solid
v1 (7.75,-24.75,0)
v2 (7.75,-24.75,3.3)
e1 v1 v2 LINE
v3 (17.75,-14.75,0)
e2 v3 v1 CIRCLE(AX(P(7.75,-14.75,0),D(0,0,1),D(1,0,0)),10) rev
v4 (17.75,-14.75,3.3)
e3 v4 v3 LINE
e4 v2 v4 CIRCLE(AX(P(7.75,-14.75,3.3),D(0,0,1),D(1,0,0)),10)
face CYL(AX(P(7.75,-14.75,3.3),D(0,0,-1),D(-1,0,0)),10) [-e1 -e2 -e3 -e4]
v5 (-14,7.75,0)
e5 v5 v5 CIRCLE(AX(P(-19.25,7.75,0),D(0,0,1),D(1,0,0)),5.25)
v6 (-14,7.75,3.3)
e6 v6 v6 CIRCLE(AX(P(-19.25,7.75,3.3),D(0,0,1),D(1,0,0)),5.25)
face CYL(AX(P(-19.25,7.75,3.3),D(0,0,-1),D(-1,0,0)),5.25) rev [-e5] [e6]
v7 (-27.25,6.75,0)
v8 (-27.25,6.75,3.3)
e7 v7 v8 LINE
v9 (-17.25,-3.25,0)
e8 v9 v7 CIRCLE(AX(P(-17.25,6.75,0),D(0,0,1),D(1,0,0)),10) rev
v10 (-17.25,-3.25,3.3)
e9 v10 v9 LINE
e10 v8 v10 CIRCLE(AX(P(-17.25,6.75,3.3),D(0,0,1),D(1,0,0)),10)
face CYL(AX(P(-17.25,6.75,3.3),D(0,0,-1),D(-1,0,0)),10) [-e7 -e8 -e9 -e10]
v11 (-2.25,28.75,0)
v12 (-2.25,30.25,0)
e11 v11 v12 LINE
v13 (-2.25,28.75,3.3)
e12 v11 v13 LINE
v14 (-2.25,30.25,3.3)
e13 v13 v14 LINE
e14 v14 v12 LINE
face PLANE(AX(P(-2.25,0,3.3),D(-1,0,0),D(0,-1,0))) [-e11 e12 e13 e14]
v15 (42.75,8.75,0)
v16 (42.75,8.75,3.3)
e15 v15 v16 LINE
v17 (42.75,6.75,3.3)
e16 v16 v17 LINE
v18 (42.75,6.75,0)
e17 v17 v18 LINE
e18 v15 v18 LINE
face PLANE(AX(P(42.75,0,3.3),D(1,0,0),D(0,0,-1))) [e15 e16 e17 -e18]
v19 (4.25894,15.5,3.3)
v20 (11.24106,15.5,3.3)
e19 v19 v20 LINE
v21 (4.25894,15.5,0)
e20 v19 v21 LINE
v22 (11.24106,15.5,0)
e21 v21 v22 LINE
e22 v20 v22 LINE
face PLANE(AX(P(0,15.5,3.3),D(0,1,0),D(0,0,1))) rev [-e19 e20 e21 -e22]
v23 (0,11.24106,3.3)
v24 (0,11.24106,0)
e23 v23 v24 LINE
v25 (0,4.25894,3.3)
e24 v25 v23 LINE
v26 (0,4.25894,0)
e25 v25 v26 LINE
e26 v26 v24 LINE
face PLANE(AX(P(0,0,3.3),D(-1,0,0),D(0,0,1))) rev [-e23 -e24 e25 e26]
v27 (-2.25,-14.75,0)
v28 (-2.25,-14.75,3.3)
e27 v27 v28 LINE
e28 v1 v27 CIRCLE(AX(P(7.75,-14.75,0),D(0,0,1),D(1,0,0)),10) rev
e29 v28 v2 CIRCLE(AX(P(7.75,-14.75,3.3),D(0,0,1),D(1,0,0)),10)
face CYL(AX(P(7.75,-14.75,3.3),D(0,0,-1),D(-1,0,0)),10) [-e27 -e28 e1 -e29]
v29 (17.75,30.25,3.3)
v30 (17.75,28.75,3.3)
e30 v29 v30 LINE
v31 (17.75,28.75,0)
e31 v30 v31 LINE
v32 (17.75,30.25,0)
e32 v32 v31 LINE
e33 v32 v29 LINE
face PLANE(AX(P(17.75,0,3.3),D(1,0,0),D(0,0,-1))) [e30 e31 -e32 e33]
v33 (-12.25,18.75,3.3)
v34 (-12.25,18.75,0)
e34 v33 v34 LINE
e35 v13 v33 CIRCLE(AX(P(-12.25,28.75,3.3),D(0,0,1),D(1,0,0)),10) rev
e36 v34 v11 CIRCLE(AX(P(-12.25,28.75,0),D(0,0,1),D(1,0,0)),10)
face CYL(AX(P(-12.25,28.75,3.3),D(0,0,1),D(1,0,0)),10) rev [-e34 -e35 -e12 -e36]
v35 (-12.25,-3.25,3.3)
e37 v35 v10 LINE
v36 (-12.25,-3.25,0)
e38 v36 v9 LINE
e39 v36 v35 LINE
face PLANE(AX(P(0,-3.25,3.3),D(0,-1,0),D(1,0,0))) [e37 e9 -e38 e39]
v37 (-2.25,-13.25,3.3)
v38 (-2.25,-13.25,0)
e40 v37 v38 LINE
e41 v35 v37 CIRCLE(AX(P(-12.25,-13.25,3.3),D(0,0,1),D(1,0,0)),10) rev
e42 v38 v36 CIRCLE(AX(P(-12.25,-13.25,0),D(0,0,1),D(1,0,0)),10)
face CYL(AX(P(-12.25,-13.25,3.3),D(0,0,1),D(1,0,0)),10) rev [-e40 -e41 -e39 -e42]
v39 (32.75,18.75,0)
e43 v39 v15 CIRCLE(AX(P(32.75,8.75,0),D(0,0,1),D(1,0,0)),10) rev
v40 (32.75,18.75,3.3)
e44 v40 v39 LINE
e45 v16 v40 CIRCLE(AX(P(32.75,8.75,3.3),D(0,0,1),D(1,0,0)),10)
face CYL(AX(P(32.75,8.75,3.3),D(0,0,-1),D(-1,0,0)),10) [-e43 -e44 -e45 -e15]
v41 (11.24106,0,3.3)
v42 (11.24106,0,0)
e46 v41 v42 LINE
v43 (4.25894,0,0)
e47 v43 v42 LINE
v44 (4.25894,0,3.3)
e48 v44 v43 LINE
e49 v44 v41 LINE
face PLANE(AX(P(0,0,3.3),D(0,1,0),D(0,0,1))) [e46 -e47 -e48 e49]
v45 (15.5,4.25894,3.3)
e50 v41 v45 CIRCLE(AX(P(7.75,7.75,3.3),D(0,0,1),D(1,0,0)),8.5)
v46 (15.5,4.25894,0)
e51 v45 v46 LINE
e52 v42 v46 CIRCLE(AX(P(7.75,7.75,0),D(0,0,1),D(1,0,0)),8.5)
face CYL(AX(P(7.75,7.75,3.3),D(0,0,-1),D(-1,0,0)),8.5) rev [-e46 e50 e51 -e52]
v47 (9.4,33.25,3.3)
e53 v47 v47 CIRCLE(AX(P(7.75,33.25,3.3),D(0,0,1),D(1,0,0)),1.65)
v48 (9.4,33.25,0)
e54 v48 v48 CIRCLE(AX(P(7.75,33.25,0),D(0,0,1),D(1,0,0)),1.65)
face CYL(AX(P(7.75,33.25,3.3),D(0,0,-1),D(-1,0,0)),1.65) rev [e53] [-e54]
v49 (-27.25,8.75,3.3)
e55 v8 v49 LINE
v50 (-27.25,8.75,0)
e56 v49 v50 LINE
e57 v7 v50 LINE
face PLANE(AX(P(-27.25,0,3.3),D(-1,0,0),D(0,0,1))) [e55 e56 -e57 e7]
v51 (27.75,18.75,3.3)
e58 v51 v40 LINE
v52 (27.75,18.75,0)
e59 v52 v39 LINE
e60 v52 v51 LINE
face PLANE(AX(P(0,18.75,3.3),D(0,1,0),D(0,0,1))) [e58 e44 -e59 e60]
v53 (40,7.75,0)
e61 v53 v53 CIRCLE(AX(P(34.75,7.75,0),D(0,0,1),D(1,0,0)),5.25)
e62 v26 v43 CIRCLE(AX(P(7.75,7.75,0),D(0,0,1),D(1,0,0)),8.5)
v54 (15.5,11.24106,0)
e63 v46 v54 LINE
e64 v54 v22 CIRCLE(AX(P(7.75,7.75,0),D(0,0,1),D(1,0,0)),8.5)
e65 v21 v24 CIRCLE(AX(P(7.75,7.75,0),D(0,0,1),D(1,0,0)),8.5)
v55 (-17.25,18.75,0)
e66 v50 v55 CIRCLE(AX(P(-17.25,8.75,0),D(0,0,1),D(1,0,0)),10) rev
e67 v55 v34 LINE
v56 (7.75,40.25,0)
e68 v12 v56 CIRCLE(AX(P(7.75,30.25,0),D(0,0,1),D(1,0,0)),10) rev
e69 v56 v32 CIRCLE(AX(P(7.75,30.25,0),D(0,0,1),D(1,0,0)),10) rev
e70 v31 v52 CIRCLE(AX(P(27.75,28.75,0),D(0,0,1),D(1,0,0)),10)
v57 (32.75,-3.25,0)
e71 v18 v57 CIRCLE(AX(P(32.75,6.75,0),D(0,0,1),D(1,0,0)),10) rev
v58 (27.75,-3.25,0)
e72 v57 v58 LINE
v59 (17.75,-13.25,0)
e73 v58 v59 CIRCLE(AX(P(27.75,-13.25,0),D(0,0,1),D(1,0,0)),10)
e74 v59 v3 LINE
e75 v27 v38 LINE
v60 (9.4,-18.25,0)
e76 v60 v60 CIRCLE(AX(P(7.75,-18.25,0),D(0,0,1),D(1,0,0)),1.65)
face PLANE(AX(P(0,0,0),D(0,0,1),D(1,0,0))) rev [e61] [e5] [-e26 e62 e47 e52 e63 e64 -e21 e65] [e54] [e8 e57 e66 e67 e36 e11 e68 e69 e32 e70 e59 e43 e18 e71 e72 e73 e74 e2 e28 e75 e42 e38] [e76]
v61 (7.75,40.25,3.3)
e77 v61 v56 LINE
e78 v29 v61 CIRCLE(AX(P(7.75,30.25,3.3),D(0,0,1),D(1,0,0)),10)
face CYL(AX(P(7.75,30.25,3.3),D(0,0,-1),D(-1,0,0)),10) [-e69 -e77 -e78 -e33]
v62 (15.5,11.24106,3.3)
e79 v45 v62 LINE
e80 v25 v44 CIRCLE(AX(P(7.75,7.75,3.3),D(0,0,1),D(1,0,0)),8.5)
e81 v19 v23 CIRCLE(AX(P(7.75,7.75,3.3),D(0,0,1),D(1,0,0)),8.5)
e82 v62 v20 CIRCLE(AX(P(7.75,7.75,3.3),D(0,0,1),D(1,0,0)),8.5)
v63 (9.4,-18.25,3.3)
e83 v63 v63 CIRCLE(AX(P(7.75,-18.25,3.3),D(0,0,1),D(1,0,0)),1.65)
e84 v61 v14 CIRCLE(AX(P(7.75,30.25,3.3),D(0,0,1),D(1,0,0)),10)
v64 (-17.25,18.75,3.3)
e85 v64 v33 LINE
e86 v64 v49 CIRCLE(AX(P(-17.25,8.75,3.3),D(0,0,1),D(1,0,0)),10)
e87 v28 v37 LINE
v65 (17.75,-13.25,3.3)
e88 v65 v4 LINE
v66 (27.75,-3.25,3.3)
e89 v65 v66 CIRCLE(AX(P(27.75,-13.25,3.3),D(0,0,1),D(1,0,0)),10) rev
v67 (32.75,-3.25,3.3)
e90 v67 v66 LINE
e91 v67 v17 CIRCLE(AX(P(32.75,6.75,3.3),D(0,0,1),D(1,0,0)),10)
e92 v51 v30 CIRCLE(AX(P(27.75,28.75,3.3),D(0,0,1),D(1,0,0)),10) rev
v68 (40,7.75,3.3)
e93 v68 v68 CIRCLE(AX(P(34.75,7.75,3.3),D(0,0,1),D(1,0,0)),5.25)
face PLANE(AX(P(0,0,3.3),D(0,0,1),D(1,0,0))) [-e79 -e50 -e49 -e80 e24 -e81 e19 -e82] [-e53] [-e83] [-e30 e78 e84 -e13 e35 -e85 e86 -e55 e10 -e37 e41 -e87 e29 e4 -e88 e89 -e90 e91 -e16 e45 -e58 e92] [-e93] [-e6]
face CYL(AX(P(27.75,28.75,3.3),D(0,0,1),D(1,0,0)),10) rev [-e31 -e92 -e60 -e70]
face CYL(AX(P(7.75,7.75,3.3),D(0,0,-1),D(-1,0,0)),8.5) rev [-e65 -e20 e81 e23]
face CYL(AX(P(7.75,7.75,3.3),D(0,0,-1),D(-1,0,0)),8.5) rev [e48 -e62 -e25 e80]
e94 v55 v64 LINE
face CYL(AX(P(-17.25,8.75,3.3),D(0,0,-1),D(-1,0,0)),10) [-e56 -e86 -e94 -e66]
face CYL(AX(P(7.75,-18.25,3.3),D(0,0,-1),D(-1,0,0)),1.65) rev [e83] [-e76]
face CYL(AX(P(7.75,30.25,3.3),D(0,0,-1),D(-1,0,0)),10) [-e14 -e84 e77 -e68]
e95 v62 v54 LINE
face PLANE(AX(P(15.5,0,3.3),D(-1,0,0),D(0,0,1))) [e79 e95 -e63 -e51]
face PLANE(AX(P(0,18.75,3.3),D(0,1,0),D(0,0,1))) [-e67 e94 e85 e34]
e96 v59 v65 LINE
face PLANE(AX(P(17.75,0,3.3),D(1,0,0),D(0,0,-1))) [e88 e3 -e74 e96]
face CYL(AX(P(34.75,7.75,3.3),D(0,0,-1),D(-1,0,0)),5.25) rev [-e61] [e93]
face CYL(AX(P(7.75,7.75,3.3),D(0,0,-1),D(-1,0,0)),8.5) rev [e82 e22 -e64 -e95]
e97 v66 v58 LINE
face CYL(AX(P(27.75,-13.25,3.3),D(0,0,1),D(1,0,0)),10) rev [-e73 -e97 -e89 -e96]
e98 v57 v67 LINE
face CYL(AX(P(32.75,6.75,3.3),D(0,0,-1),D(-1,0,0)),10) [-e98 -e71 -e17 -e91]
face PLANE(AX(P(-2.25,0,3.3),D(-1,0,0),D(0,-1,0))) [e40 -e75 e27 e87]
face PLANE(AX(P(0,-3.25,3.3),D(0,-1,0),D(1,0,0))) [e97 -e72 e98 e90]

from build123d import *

# Parameters (mm, degrees)
SKETCH_1_R      = 5.25
SKETCH_1_R_2    = 1.65
EXTRUDE_1_DEPTH = 3.3
FILLET_1_R      = 10


with BuildPart() as part:
    # 草图1 → 凸台-拉伸1 (new body)
    with BuildSketch(Plane.XY):
        Polygon((-27.25, -3.25), (-27.25, 18.75), (-2.25, 18.75), (-2.25, 40.25), (17.75, 40.25), (17.75, 18.75), (42.75, 18.75), (42.75, -3.25), (17.75, -3.25), (17.75, -24.75), (-2.25, -24.75), (-2.25, -3.25), align=None)
        with Locations((34.75, 7.75)):
            Circle(SKETCH_1_R, mode=Mode.SUBTRACT)
        with Locations((-19.25, 7.75)):
            Circle(SKETCH_1_R, mode=Mode.SUBTRACT)
        with Locations((7.75, 33.25)):
            Circle(SKETCH_1_R_2, mode=Mode.SUBTRACT)
        with Locations((7.75, -18.25)):
            Circle(SKETCH_1_R_2, mode=Mode.SUBTRACT)
        with BuildLine():
            Line((4.258939989, 0), (11.241060011, 0))
            ThreePointArc((11.241060011, 0), (13.76040764, 1.73959236), (15.5, 4.258939989))
            Line((15.5, 4.258939989), (15.5, 11.241060011))
            ThreePointArc((15.5, 11.241060011), (13.76040764, 13.76040764), (11.241060011, 15.5))
            Line((11.241060011, 15.5), (4.258939989, 15.5))
            ThreePointArc((4.258939989, 15.5), (1.73959236, 13.76040764), (0, 11.241060011))
            Line((0, 11.241060011), (0, 4.258939989))
            ThreePointArc((0, 4.258939989), (1.73959236, 1.73959236), (4.258939989, 0))
        make_face(mode=Mode.SUBTRACT)
    extrude(amount=EXTRUDE_1_DEPTH)

    # 圆角1
    fillet_1_edges = [part.edges().sort_by_distance(p)[0] for p in [
        (-27.25, 18.75, 1.65),
        (-27.25, -3.25, 1.65),
        (-2.25, -3.25, 1.65),
        (-2.25, -24.75, 1.65),
        (17.75, -24.75, 1.65),
        (17.75, -3.25, 1.65),
        (42.75, -3.25, 1.65),
        (42.75, 18.75, 1.65),
        (17.75, 18.75, 1.65),
        (-2.25, 18.75, 1.65),
        (-2.25, 40.25, 1.65),
        (17.75, 40.25, 1.65),
    ]]
    fillet(fillet_1_edges, radius=FILLET_1_R - 0.0001)  # a hair under: the kernel refuses the full size


solid = part.part
